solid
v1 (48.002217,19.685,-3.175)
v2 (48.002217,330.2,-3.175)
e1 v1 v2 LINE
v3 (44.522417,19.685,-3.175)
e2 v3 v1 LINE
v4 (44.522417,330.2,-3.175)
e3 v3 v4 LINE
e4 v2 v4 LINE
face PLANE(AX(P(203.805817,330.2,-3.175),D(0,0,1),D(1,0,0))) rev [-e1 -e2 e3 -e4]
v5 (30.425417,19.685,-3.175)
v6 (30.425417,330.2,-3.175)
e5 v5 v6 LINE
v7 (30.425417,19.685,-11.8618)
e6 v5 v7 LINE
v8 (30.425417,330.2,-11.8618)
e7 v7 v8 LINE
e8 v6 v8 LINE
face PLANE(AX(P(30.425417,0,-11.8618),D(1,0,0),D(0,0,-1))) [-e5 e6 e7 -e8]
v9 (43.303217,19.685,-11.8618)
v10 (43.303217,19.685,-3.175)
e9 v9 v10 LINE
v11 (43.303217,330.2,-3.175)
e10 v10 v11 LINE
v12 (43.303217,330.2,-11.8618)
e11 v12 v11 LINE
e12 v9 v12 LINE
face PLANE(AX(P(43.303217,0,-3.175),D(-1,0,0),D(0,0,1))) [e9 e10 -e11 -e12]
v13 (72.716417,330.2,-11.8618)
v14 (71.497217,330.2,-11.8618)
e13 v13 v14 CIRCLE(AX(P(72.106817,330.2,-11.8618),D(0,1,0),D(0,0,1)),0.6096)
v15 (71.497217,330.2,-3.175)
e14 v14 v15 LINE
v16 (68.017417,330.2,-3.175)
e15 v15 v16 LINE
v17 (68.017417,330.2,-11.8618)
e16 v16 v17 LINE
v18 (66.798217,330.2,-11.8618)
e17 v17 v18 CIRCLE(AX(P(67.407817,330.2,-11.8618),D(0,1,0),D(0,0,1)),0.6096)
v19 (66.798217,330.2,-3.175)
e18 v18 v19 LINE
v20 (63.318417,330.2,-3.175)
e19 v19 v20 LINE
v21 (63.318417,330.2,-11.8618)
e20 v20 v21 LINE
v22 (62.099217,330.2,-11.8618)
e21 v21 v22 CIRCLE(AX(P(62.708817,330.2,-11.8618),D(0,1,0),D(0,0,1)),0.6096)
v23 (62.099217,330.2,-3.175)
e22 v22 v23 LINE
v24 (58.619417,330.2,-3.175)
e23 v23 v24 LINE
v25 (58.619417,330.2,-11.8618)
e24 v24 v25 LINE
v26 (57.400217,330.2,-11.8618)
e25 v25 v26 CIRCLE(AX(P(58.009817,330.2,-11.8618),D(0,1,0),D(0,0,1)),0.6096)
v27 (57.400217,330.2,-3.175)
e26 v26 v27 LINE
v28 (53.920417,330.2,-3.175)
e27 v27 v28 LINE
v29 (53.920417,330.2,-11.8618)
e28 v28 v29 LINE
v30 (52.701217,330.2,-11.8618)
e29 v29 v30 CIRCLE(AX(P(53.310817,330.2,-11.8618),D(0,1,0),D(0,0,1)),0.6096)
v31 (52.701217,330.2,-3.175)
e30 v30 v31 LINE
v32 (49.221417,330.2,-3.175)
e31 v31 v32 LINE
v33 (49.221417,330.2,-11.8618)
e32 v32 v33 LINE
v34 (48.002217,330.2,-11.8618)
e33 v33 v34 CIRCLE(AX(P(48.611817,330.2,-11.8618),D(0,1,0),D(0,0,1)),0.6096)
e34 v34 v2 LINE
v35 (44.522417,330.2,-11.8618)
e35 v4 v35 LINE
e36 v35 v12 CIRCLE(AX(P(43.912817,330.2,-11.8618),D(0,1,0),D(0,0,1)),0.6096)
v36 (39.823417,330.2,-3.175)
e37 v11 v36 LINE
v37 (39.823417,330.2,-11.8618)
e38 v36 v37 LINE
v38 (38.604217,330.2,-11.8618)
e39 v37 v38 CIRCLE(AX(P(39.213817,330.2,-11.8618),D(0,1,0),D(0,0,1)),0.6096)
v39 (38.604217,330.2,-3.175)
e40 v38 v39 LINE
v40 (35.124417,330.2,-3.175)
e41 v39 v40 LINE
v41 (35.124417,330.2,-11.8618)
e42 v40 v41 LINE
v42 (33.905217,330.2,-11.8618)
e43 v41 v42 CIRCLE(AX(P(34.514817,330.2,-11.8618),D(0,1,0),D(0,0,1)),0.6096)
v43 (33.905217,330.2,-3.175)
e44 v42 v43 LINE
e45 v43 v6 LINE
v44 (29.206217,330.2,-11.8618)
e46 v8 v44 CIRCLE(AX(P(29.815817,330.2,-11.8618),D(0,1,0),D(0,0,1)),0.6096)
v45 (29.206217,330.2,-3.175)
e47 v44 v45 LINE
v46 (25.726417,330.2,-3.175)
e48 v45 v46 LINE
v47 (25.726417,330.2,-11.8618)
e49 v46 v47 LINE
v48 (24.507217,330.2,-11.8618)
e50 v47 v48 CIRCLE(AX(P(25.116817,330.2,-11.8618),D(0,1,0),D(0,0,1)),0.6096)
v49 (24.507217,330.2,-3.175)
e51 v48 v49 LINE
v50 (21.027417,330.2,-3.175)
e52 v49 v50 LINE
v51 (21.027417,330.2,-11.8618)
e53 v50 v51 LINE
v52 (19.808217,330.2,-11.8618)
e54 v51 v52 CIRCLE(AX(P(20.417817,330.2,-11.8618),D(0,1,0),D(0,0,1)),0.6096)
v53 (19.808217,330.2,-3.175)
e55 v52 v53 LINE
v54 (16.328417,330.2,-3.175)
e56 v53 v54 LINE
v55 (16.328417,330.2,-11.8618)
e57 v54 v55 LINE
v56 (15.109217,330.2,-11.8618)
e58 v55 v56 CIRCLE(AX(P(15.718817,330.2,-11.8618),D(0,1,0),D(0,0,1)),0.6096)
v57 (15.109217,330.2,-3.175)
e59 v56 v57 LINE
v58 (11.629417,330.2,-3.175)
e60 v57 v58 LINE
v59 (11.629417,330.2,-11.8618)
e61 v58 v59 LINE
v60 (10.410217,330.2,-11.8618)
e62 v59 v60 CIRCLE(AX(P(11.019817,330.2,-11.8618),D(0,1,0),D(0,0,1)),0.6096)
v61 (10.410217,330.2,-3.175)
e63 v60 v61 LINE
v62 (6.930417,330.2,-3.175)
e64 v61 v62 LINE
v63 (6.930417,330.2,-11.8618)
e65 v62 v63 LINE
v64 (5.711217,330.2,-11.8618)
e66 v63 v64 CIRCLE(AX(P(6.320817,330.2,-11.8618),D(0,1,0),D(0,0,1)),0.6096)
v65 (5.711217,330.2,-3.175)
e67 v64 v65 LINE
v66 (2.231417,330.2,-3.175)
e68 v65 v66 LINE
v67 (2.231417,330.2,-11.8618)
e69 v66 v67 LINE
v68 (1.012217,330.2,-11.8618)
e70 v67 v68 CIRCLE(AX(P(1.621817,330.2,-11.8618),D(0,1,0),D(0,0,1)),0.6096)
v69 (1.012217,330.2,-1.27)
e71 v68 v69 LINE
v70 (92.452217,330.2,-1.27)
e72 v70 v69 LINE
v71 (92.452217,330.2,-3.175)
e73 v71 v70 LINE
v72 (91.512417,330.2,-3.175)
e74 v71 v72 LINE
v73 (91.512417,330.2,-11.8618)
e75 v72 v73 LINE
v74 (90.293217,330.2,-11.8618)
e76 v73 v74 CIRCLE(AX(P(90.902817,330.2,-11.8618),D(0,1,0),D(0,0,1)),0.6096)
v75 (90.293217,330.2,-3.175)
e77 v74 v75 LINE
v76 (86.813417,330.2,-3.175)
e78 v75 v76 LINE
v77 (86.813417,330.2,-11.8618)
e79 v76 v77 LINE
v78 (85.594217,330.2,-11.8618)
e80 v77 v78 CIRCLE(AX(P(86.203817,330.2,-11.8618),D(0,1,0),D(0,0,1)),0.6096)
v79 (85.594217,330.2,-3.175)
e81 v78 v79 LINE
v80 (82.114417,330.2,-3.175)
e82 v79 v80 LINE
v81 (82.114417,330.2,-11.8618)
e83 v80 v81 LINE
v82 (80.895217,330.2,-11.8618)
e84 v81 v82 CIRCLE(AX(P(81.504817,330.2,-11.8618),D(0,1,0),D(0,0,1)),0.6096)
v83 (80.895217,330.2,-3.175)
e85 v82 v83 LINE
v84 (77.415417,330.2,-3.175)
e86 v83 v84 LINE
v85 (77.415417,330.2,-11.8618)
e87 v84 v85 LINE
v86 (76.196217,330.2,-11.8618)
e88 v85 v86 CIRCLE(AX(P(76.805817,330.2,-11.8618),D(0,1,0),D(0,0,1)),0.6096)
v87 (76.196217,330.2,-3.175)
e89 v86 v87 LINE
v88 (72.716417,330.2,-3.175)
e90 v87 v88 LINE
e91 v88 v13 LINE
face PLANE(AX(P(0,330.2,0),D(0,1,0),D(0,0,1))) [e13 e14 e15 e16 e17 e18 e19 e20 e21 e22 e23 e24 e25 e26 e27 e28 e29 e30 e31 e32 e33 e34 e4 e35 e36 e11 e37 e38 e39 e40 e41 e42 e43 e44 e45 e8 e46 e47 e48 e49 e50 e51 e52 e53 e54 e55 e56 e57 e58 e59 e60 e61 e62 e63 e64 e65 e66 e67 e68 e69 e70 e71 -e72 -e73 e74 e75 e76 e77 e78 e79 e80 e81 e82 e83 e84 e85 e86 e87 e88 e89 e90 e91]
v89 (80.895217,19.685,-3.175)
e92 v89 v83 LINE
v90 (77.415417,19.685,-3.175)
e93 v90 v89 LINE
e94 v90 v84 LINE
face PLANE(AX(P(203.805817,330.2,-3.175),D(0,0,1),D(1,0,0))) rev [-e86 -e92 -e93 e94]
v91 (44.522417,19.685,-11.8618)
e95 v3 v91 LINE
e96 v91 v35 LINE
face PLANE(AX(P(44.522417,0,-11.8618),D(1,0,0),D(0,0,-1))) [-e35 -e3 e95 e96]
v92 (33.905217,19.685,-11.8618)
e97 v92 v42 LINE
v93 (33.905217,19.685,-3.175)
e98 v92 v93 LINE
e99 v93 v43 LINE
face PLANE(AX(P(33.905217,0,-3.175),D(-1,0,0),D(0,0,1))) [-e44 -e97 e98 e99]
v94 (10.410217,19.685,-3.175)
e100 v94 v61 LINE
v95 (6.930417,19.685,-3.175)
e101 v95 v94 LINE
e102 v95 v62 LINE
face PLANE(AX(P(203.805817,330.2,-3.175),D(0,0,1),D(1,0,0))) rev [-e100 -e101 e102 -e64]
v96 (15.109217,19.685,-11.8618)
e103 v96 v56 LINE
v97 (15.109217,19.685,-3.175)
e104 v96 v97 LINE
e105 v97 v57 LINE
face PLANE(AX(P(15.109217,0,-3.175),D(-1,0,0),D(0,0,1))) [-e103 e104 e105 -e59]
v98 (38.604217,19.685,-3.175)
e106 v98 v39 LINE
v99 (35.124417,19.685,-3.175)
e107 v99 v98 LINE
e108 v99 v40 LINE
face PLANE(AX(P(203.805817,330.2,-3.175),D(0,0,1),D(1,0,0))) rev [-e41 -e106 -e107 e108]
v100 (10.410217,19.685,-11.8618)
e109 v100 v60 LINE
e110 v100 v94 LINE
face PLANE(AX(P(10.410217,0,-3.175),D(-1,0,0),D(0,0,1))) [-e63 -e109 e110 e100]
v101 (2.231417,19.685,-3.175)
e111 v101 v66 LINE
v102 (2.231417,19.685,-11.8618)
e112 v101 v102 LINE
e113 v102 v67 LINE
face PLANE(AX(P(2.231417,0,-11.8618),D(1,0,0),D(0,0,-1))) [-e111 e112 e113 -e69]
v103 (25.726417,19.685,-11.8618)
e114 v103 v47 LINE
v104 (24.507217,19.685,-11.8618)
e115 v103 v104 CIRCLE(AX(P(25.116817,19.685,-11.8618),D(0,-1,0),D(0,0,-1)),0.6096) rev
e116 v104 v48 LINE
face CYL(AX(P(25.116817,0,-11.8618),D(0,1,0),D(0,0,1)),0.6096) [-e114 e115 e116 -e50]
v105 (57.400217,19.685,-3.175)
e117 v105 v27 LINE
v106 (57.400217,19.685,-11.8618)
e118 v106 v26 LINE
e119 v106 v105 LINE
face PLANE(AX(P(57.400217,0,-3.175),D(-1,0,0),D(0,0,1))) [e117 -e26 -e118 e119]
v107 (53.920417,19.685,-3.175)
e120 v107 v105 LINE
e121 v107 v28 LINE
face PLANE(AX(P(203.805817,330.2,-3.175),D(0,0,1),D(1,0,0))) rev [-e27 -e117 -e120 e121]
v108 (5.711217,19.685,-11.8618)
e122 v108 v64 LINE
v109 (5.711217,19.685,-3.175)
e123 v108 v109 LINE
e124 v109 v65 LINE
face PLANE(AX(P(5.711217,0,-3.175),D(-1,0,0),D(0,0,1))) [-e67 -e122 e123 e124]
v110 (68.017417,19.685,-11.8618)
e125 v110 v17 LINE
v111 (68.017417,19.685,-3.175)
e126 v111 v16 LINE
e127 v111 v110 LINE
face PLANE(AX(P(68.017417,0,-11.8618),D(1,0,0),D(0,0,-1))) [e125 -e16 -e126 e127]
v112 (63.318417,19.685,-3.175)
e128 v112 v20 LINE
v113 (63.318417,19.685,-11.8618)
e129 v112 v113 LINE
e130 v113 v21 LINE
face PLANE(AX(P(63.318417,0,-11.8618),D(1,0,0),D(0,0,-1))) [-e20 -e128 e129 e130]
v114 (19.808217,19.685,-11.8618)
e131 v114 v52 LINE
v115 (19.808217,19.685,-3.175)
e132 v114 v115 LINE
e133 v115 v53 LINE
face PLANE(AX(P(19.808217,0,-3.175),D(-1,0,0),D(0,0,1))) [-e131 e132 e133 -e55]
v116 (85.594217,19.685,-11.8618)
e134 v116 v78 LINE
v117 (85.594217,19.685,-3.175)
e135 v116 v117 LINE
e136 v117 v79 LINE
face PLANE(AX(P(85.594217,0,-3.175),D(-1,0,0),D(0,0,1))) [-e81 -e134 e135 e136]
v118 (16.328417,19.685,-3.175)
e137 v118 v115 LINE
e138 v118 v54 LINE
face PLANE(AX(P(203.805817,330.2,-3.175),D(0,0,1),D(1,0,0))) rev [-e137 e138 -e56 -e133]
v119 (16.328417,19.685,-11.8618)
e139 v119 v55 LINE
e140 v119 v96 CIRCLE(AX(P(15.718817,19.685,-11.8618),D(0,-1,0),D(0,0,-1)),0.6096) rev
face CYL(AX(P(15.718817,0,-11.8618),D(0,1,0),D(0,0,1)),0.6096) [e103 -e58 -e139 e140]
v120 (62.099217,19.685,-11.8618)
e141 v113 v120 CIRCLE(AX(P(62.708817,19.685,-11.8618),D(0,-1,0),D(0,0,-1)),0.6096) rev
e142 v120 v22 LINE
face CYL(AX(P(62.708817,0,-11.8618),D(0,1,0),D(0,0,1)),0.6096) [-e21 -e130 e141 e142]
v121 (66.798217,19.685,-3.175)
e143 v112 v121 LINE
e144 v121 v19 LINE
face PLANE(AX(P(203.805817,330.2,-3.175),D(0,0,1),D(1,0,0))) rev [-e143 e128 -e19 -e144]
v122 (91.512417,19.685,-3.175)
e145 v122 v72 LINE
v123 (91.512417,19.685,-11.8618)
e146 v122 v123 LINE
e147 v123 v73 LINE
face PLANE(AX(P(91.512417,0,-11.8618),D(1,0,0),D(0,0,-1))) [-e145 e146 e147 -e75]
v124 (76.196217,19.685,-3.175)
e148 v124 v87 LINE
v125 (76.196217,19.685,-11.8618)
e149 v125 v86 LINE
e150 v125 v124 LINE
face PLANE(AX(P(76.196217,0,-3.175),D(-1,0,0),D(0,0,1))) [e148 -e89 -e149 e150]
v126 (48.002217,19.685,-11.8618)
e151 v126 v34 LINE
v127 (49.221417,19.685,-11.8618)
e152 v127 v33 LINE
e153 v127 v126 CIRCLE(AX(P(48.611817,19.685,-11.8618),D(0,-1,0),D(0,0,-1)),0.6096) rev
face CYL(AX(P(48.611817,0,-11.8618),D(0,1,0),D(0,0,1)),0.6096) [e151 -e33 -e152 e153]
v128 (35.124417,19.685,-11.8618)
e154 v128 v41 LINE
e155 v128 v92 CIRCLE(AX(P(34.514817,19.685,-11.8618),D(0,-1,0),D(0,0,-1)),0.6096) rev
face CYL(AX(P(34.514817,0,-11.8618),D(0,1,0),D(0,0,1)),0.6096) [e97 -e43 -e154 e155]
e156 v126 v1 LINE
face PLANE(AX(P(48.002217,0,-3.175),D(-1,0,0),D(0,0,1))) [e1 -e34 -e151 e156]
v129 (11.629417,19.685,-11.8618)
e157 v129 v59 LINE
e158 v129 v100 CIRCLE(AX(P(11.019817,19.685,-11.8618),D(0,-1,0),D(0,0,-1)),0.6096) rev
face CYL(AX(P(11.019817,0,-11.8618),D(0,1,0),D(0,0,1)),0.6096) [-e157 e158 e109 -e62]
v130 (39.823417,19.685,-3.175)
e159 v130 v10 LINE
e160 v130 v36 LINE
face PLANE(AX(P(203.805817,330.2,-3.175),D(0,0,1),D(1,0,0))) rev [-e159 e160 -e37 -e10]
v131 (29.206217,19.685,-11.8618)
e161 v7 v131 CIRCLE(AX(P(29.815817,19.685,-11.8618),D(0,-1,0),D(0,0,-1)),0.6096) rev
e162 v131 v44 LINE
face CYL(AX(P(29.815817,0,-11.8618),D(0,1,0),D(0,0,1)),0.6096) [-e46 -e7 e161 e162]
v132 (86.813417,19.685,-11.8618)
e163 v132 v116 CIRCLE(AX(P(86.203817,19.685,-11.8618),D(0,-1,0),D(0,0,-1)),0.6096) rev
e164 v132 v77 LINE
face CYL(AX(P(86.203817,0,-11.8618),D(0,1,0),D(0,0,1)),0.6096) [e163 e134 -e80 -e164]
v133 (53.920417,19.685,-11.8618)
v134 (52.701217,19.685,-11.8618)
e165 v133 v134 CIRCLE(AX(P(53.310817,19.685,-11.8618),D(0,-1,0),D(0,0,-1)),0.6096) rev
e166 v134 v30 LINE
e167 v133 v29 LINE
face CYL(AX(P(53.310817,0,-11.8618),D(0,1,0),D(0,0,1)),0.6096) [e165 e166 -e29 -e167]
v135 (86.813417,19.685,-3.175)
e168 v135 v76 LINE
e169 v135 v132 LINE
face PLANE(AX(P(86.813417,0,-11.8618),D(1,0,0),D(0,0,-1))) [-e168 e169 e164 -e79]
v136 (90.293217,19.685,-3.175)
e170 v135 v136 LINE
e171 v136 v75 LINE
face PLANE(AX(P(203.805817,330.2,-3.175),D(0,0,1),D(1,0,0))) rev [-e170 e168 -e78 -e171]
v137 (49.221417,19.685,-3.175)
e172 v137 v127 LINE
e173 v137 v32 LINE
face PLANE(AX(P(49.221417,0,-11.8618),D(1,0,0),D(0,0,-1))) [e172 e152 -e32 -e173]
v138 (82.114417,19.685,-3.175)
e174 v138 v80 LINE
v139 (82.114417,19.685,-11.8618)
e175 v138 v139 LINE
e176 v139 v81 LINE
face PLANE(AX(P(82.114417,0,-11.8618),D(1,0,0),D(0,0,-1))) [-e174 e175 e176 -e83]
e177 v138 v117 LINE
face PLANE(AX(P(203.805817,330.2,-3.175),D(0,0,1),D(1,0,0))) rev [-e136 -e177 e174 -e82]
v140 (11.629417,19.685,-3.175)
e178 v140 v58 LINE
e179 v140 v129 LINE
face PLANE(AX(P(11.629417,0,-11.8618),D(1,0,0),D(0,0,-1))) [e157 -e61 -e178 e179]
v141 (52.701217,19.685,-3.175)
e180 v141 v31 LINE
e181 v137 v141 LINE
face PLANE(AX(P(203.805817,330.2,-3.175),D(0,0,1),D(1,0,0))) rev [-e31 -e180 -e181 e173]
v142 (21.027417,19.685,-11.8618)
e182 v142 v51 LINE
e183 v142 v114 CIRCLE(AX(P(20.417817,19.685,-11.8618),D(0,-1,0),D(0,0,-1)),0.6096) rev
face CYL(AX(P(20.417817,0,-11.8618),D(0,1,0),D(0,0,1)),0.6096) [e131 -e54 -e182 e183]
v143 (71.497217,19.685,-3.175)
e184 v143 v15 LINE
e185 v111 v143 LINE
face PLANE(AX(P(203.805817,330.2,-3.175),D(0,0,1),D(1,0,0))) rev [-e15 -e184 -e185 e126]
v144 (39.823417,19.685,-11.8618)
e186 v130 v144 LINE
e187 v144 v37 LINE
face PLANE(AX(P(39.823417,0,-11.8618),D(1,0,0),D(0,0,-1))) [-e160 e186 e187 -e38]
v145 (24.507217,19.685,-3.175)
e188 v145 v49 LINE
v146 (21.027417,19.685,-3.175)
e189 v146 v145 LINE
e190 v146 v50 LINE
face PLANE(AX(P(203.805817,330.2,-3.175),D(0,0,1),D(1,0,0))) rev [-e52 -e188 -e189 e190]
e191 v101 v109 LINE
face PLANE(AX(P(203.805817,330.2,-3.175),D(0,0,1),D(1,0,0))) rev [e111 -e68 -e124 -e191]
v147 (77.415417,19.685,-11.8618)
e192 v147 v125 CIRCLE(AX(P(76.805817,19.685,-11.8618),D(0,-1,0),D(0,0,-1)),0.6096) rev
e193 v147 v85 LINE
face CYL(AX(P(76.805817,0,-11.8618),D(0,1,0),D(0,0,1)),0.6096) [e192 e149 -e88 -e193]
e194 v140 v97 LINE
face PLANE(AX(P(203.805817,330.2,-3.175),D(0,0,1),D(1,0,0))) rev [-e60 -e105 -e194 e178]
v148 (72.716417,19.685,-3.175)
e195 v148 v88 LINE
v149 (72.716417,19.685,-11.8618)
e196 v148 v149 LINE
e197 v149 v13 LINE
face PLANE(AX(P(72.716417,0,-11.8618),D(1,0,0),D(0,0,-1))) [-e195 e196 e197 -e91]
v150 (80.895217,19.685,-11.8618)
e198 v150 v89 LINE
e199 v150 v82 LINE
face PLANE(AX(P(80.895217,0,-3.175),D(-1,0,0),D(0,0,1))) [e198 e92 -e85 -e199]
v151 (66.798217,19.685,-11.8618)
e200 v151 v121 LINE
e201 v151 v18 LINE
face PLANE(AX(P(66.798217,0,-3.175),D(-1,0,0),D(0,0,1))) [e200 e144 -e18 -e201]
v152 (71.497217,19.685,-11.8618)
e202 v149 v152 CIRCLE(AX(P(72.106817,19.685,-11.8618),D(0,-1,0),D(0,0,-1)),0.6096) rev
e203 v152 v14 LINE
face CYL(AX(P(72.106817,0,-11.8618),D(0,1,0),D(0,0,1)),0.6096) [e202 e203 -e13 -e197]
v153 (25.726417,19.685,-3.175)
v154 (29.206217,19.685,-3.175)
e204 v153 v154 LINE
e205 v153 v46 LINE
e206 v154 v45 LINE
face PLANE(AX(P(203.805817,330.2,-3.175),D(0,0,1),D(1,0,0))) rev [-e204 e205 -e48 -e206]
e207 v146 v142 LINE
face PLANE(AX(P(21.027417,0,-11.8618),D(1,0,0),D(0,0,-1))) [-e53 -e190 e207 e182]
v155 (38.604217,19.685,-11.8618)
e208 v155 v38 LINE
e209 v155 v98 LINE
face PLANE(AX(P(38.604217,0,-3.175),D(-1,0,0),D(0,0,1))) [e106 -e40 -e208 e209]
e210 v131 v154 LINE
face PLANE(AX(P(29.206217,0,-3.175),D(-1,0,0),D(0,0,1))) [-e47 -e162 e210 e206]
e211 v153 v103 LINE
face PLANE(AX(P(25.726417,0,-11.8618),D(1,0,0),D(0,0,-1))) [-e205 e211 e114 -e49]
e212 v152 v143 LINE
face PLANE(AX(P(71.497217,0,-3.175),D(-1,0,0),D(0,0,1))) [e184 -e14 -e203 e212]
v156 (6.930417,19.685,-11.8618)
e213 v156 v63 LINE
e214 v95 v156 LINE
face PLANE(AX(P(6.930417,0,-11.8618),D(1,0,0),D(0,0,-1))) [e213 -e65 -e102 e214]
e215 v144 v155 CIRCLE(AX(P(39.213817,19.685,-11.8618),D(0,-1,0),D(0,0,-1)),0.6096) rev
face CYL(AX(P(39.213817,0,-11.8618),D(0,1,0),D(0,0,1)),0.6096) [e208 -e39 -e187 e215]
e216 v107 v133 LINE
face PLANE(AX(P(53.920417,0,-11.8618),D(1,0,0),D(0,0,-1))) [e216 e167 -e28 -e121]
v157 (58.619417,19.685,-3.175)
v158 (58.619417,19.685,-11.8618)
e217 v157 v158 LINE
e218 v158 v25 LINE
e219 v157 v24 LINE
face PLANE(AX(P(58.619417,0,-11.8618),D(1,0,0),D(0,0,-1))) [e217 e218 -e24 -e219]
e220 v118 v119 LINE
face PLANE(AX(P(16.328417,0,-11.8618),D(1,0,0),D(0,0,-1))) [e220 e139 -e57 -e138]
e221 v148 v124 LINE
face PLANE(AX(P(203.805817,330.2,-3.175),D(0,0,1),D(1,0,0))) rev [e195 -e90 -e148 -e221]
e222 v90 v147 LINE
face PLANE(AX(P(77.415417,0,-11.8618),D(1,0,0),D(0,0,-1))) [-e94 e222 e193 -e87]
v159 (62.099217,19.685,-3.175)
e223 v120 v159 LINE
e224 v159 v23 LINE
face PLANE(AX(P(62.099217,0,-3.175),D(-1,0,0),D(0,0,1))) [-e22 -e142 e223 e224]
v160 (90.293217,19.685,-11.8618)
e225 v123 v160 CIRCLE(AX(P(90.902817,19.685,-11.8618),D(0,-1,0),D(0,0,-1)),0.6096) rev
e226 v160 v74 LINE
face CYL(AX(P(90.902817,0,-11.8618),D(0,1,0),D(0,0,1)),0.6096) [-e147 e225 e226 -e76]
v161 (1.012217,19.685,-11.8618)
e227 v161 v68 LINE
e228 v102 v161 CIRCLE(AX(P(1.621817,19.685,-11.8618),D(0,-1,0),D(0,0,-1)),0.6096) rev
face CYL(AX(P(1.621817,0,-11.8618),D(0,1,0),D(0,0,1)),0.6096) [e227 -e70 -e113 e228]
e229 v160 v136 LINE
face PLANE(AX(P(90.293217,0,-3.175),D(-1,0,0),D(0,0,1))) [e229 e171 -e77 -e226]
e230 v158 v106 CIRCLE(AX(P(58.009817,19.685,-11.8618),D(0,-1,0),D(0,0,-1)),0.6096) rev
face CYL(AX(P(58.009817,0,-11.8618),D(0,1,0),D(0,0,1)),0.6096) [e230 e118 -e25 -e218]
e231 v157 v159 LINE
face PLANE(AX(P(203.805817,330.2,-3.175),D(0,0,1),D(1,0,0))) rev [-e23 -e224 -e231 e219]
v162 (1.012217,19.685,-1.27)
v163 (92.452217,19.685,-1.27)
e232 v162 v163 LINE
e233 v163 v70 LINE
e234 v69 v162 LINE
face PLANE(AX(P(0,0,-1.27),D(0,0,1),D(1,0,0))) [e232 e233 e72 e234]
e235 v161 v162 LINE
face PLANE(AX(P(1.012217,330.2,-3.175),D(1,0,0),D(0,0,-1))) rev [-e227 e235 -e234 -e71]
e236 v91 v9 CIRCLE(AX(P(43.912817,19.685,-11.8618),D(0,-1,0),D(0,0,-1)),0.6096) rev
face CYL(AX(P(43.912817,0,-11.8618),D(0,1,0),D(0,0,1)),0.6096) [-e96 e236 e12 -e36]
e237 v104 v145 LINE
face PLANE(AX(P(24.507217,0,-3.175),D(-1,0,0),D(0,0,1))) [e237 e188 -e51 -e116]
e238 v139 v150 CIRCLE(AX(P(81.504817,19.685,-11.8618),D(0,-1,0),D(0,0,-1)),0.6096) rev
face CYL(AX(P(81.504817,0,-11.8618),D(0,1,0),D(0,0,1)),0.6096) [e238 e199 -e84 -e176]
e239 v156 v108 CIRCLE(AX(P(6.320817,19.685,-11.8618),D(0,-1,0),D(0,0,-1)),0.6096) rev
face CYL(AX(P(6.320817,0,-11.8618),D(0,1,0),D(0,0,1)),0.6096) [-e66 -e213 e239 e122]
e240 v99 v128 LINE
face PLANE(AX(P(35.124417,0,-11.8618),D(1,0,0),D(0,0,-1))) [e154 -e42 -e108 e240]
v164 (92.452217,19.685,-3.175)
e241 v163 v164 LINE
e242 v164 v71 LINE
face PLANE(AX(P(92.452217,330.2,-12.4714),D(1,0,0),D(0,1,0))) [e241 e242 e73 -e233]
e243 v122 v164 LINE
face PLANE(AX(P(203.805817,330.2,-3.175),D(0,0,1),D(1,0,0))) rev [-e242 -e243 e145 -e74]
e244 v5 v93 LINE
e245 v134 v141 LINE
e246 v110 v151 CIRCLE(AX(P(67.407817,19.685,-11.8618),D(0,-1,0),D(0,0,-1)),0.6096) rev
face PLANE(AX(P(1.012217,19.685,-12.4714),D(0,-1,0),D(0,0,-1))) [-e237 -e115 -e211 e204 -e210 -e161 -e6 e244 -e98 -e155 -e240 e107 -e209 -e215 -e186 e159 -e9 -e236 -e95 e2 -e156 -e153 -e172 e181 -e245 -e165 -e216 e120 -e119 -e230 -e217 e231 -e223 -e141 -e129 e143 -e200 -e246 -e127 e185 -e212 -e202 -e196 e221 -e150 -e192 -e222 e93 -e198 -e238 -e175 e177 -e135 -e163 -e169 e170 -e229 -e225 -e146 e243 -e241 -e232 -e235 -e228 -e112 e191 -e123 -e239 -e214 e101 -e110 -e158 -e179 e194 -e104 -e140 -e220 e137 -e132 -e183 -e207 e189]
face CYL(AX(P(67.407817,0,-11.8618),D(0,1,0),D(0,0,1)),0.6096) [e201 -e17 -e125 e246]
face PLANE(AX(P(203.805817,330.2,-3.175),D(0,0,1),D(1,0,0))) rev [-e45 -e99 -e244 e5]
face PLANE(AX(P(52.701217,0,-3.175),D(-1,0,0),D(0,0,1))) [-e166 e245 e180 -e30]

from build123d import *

# Parameters (mm, degrees)
BOSS_EXTRUDE1_DEPTH   = 330.2
BOSS_EXTRUDE2_DEPTH   = 330.2
SKETCH_PATTERN1_DEPTH = 330.2
SKETCH5_W             = 0.4826
SKETCH5_H             = 3.175
BOSS_EXTRUDE3_DEPTH   = 254
SKETCH10_OUTSIDE_W    = 282.866
SKETCH10_OUTSIDE_H    = 409.79
SKETCH10_OUTSIDE_W_2  = 91.44
SKETCH10_OUTSIDE_H_2  = 330.2
CUT_EXTRUDE3_DEPTH    = 389.485949469
SKETCH11_OUTSIDE_W    = 162.01
SKETCH11_OUTSIDE_H    = 400.77
SKETCH11_OUTSIDE_W_2  = 91.44
SKETCH11_OUTSIDE_H_2  = 310.515
CUT_EXTRUDE4_DEPTH    = 344.125324268
SKETCH12_W            = 91.44
SKETCH12_H            = 310.515
CUT_EXTRUDE5_DEPTH    = 1.27


# Read off the part's stored shape, not the designer's step: Sketch-Pattern1
with BuildPart() as part:
    # Sketch1 → Boss-Extrude1 (new body)
    with BuildSketch(Plane(origin=(0, 0, 0), x_dir=(1, 0, 0), z_dir=(0, 1, 0))):
        Polygon((1.012216501, 3.175), (1.012216501, 0), (203.805816501, 0), (203.805816501, 3.175), (2.231416501, 3.175), align=None)
    extrude(amount=BOSS_EXTRUDE1_DEPTH)

    # Sketch3 → Boss-Extrude2 (add, through all)
    with BuildSketch(Plane(origin=(0, 330.2, 0), x_dir=(1, 0, 0), z_dir=(0, 1, 0))):
        with BuildLine():
            Line((1.012216501, 3.175), (1.012216501, 11.8618))
            ThreePointArc((1.012216501, 11.8618), (1.621816501, 12.4714), (2.231416501, 11.8618))
            Line((2.231416501, 11.8618), (2.231416501, 3.175))
            Line((2.231416501, 3.175), (1.012216501, 3.175))
        make_face()
    extrude(amount=-BOSS_EXTRUDE2_DEPTH)

    # Sketch-Pattern1 outline → Sketch-Pattern1 (add)
    with BuildSketch(Plane(origin=(0, 0, 0), x_dir=(1, 0, 0), z_dir=(0, 1, 0))):
        with BuildLine():
            Line((6.930416501, 3.175), (6.930416501, 11.8618))
            ThreePointArc((6.930416501, 11.8618), (6.320816501, 12.4714), (5.711216501, 11.8618))
            Line((5.711216501, 11.8618), (5.711216501, 3.175))
            Line((5.711216501, 3.175), (6.930416501, 3.175))
        make_face()
        with BuildLine():
            Line((203.069216501, 11.8618), (203.069216501, 3.175))
            Line((203.069216501, 3.175), (204.288416501, 3.175))
            Line((204.288416501, 3.175), (204.288416501, 11.8618))
            ThreePointArc((204.288416501, 11.8618), (203.678816501, 12.4714), (203.069216501, 11.8618))
        make_face()
        with BuildLine():
            Line((198.370216501, 11.8618), (198.370216501, 3.175))
            Line((198.370216501, 3.175), (199.589416501, 3.175))
            Line((199.589416501, 3.175), (199.589416501, 11.8618))
            ThreePointArc((199.589416501, 11.8618), (198.979816501, 12.4714), (198.370216501, 11.8618))
        make_face()
        with BuildLine():
            Line((193.671216501, 11.8618), (193.671216501, 3.175))
            Line((193.671216501, 3.175), (194.890416501, 3.175))
            Line((194.890416501, 3.175), (194.890416501, 11.8618))
            ThreePointArc((194.890416501, 11.8618), (194.280816501, 12.4714), (193.671216501, 11.8618))
        make_face()
        with BuildLine():
            Line((188.972216501, 11.8618), (188.972216501, 3.175))
            Line((188.972216501, 3.175), (190.191416501, 3.175))
            Line((190.191416501, 3.175), (190.191416501, 11.8618))
            ThreePointArc((190.191416501, 11.8618), (189.581816501, 12.4714), (188.972216501, 11.8618))
        make_face()
        with BuildLine():
            Line((184.273216501, 11.8618), (184.273216501, 3.175))
            Line((184.273216501, 3.175), (185.492416501, 3.175))
            Line((185.492416501, 3.175), (185.492416501, 11.8618))
            ThreePointArc((185.492416501, 11.8618), (184.882816501, 12.4714), (184.273216501, 11.8618))
        make_face()
        with BuildLine():
            Line((179.574216501, 11.8618), (179.574216501, 3.175))
            Line((179.574216501, 3.175), (180.793416501, 3.175))
            Line((180.793416501, 3.175), (180.793416501, 11.8618))
            ThreePointArc((180.793416501, 11.8618), (180.183816501, 12.4714), (179.574216501, 11.8618))
        make_face()
        with BuildLine():
            Line((174.875216501, 11.8618), (174.875216501, 3.175))
            Line((174.875216501, 3.175), (176.094416501, 3.175))
            Line((176.094416501, 3.175), (176.094416501, 11.8618))
            ThreePointArc((176.094416501, 11.8618), (175.484816501, 12.4714), (174.875216501, 11.8618))
        make_face()
        with BuildLine():
            Line((170.176216501, 11.8618), (170.176216501, 3.175))
            Line((170.176216501, 3.175), (171.395416501, 3.175))
            Line((171.395416501, 3.175), (171.395416501, 11.8618))
            ThreePointArc((171.395416501, 11.8618), (170.785816501, 12.4714), (170.176216501, 11.8618))
        make_face()
        with BuildLine():
            Line((165.477216501, 11.8618), (165.477216501, 3.175))
            Line((165.477216501, 3.175), (166.696416501, 3.175))
            Line((166.696416501, 3.175), (166.696416501, 11.8618))
            ThreePointArc((166.696416501, 11.8618), (166.086816501, 12.4714), (165.477216501, 11.8618))
        make_face()
        with BuildLine():
            Line((160.778216501, 11.8618), (160.778216501, 3.175))
            Line((160.778216501, 3.175), (161.997416501, 3.175))
            Line((161.997416501, 3.175), (161.997416501, 11.8618))
            ThreePointArc((161.997416501, 11.8618), (161.387816501, 12.4714), (160.778216501, 11.8618))
        make_face()
        with BuildLine():
            Line((156.079216501, 11.8618), (156.079216501, 3.175))
            Line((156.079216501, 3.175), (157.298416501, 3.175))
            Line((157.298416501, 3.175), (157.298416501, 11.8618))
            ThreePointArc((157.298416501, 11.8618), (156.688816501, 12.4714), (156.079216501, 11.8618))
        make_face()
        with BuildLine():
            Line((151.380216501, 11.8618), (151.380216501, 3.175))
            Line((151.380216501, 3.175), (152.599416501, 3.175))
            Line((152.599416501, 3.175), (152.599416501, 11.8618))
            ThreePointArc((152.599416501, 11.8618), (151.989816501, 12.4714), (151.380216501, 11.8618))
        make_face()
        with BuildLine():
            Line((146.681216501, 11.8618), (146.681216501, 3.175))
            Line((146.681216501, 3.175), (147.900416501, 3.175))
            Line((147.900416501, 3.175), (147.900416501, 11.8618))
            ThreePointArc((147.900416501, 11.8618), (147.290816501, 12.4714), (146.681216501, 11.8618))
        make_face()
        with BuildLine():
            Line((141.982216501, 11.8618), (141.982216501, 3.175))
            Line((141.982216501, 3.175), (143.201416501, 3.175))
            Line((143.201416501, 3.175), (143.201416501, 11.8618))
            ThreePointArc((143.201416501, 11.8618), (142.591816501, 12.4714), (141.982216501, 11.8618))
        make_face()
        with BuildLine():
            Line((137.283216501, 11.8618), (137.283216501, 3.175))
            Line((137.283216501, 3.175), (138.502416501, 3.175))
            Line((138.502416501, 3.175), (138.502416501, 11.8618))
            ThreePointArc((138.502416501, 11.8618), (137.892816501, 12.4714), (137.283216501, 11.8618))
        make_face()
        with BuildLine():
            Line((132.584216501, 11.8618), (132.584216501, 3.175))
            Line((132.584216501, 3.175), (133.803416501, 3.175))
            Line((133.803416501, 3.175), (133.803416501, 11.8618))
            ThreePointArc((133.803416501, 11.8618), (133.193816501, 12.4714), (132.584216501, 11.8618))
        make_face()
        with BuildLine():
            Line((127.885216501, 11.8618), (127.885216501, 3.175))
            Line((127.885216501, 3.175), (129.104416501, 3.175))
            Line((129.104416501, 3.175), (129.104416501, 11.8618))
            ThreePointArc((129.104416501, 11.8618), (128.494816501, 12.4714), (127.885216501, 11.8618))
        make_face()
        with BuildLine():
            Line((123.186216501, 11.8618), (123.186216501, 3.175))
            Line((123.186216501, 3.175), (124.405416501, 3.175))
            Line((124.405416501, 3.175), (124.405416501, 11.8618))
            ThreePointArc((124.405416501, 11.8618), (123.795816501, 12.4714), (123.186216501, 11.8618))
        make_face()
        with BuildLine():
            Line((118.487216501, 11.8618), (118.487216501, 3.175))
            Line((118.487216501, 3.175), (119.706416501, 3.175))
            Line((119.706416501, 3.175), (119.706416501, 11.8618))
            ThreePointArc((119.706416501, 11.8618), (119.096816501, 12.4714), (118.487216501, 11.8618))
        make_face()
        with BuildLine():
            Line((113.788216501, 11.8618), (113.788216501, 3.175))
            Line((113.788216501, 3.175), (115.007416501, 3.175))
            Line((115.007416501, 3.175), (115.007416501, 11.8618))
            ThreePointArc((115.007416501, 11.8618), (114.397816501, 12.4714), (113.788216501, 11.8618))
        make_face()
        with BuildLine():
            Line((109.089216501, 11.8618), (109.089216501, 3.175))
            Line((109.089216501, 3.175), (110.308416501, 3.175))
            Line((110.308416501, 3.175), (110.308416501, 11.8618))
            ThreePointArc((110.308416501, 11.8618), (109.698816501, 12.4714), (109.089216501, 11.8618))
        make_face()
        with BuildLine():
            Line((104.390216501, 11.8618), (104.390216501, 3.175))
            Line((104.390216501, 3.175), (105.609416501, 3.175))
            Line((105.609416501, 3.175), (105.609416501, 11.8618))
            ThreePointArc((105.609416501, 11.8618), (104.999816501, 12.4714), (104.390216501, 11.8618))
        make_face()
        with BuildLine():
            Line((99.691216501, 11.8618), (99.691216501, 3.175))
            Line((99.691216501, 3.175), (100.910416501, 3.175))
            Line((100.910416501, 3.175), (100.910416501, 11.8618))
            ThreePointArc((100.910416501, 11.8618), (100.300816501, 12.4714), (99.691216501, 11.8618))
        make_face()
        with BuildLine():
            Line((94.992216501, 11.8618), (94.992216501, 3.175))
            Line((94.992216501, 3.175), (96.211416501, 3.175))
            Line((96.211416501, 3.175), (96.211416501, 11.8618))
            ThreePointArc((96.211416501, 11.8618), (95.601816501, 12.4714), (94.992216501, 11.8618))
        make_face()
        with BuildLine():
            Line((90.293216501, 11.8618), (90.293216501, 3.175))
            Line((90.293216501, 3.175), (91.512416501, 3.175))
            Line((91.512416501, 3.175), (91.512416501, 11.8618))
            ThreePointArc((91.512416501, 11.8618), (90.902816501, 12.4714), (90.293216501, 11.8618))
        make_face()
        with BuildLine():
            Line((85.594216501, 11.8618), (85.594216501, 3.175))
            Line((85.594216501, 3.175), (86.813416501, 3.175))
            Line((86.813416501, 3.175), (86.813416501, 11.8618))
            ThreePointArc((86.813416501, 11.8618), (86.203816501, 12.4714), (85.594216501, 11.8618))
        make_face()
        with BuildLine():
            Line((80.895216501, 11.8618), (80.895216501, 3.175))
            Line((80.895216501, 3.175), (82.114416501, 3.175))
            Line((82.114416501, 3.175), (82.114416501, 11.8618))
            ThreePointArc((82.114416501, 11.8618), (81.504816501, 12.4714), (80.895216501, 11.8618))
        make_face()
        with BuildLine():
            Line((76.196216501, 11.8618), (76.196216501, 3.175))
            Line((76.196216501, 3.175), (77.415416501, 3.175))
            Line((77.415416501, 3.175), (77.415416501, 11.8618))
            ThreePointArc((77.415416501, 11.8618), (76.805816501, 12.4714), (76.196216501, 11.8618))
        make_face()
        with BuildLine():
            Line((71.497216501, 11.8618), (71.497216501, 3.175))
            Line((71.497216501, 3.175), (72.716416501, 3.175))
            Line((72.716416501, 3.175), (72.716416501, 11.8618))
            ThreePointArc((72.716416501, 11.8618), (72.106816501, 12.4714), (71.497216501, 11.8618))
        make_face()
        with BuildLine():
            Line((66.798216501, 11.8618), (66.798216501, 3.175))
            Line((66.798216501, 3.175), (68.017416501, 3.175))
            Line((68.017416501, 3.175), (68.017416501, 11.8618))
            ThreePointArc((68.017416501, 11.8618), (67.407816501, 12.4714), (66.798216501, 11.8618))
        make_face()
        with BuildLine():
            Line((62.099216501, 11.8618), (62.099216501, 3.175))
            Line((62.099216501, 3.175), (63.318416501, 3.175))
            Line((63.318416501, 3.175), (63.318416501, 11.8618))
            ThreePointArc((63.318416501, 11.8618), (62.708816501, 12.4714), (62.099216501, 11.8618))
        make_face()
        with BuildLine():
            Line((57.400216501, 11.8618), (57.400216501, 3.175))
            Line((57.400216501, 3.175), (58.619416501, 3.175))
            Line((58.619416501, 3.175), (58.619416501, 11.8618))
            ThreePointArc((58.619416501, 11.8618), (58.009816501, 12.4714), (57.400216501, 11.8618))
        make_face()
        with BuildLine():
            Line((52.701216501, 11.8618), (52.701216501, 3.175))
            Line((52.701216501, 3.175), (53.920416501, 3.175))
            Line((53.920416501, 3.175), (53.920416501, 11.8618))
            ThreePointArc((53.920416501, 11.8618), (53.310816501, 12.4714), (52.701216501, 11.8618))
        make_face()
        with BuildLine():
            Line((48.002216501, 11.8618), (48.002216501, 3.175))
            Line((48.002216501, 3.175), (49.221416501, 3.175))
            Line((49.221416501, 3.175), (49.221416501, 11.8618))
            ThreePointArc((49.221416501, 11.8618), (48.611816501, 12.4714), (48.002216501, 11.8618))
        make_face()
        with BuildLine():
            Line((43.303216501, 11.8618), (43.303216501, 3.175))
            Line((43.303216501, 3.175), (44.522416501, 3.175))
            Line((44.522416501, 3.175), (44.522416501, 11.8618))
            ThreePointArc((44.522416501, 11.8618), (43.912816501, 12.4714), (43.303216501, 11.8618))
        make_face()
        with BuildLine():
            Line((38.604216501, 11.8618), (38.604216501, 3.175))
            Line((38.604216501, 3.175), (39.823416501, 3.175))
            Line((39.823416501, 3.175), (39.823416501, 11.8618))
            ThreePointArc((39.823416501, 11.8618), (39.213816501, 12.4714), (38.604216501, 11.8618))
        make_face()
        with BuildLine():
            Line((33.905216501, 11.8618), (33.905216501, 3.175))
            Line((33.905216501, 3.175), (35.124416501, 3.175))
            Line((35.124416501, 3.175), (35.124416501, 11.8618))
            ThreePointArc((35.124416501, 11.8618), (34.514816501, 12.4714), (33.905216501, 11.8618))
        make_face()
        with BuildLine():
            Line((29.206216501, 11.8618), (29.206216501, 3.175))
            Line((29.206216501, 3.175), (30.425416501, 3.175))
            Line((30.425416501, 3.175), (30.425416501, 11.8618))
            ThreePointArc((30.425416501, 11.8618), (29.815816501, 12.4714), (29.206216501, 11.8618))
        make_face()
        with BuildLine():
            Line((24.507216501, 11.8618), (24.507216501, 3.175))
            Line((24.507216501, 3.175), (25.726416501, 3.175))
            Line((25.726416501, 3.175), (25.726416501, 11.8618))
            ThreePointArc((25.726416501, 11.8618), (25.116816501, 12.4714), (24.507216501, 11.8618))
        make_face()
        with BuildLine():
            Line((19.808216501, 11.8618), (19.808216501, 3.175))
            Line((19.808216501, 3.175), (21.027416501, 3.175))
            Line((21.027416501, 3.175), (21.027416501, 11.8618))
            ThreePointArc((21.027416501, 11.8618), (20.417816501, 12.4714), (19.808216501, 11.8618))
        make_face()
        with BuildLine():
            Line((15.109216501, 11.8618), (15.109216501, 3.175))
            Line((15.109216501, 3.175), (16.328416501, 3.175))
            Line((16.328416501, 3.175), (16.328416501, 11.8618))
            ThreePointArc((16.328416501, 11.8618), (15.718816501, 12.4714), (15.109216501, 11.8618))
        make_face()
        with BuildLine():
            Line((10.410216501, 11.8618), (10.410216501, 3.175))
            Line((10.410216501, 3.175), (11.629416501, 3.175))
            Line((11.629416501, 3.175), (11.629416501, 11.8618))
            ThreePointArc((11.629416501, 11.8618), (11.019816501, 12.4714), (10.410216501, 11.8618))
        make_face()
    extrude(amount=SKETCH_PATTERN1_DEPTH)

    # Sketch5 → Boss-Extrude3 (add)
    with BuildSketch(Plane(origin=(0, 330.2, 0), x_dir=(1, 0, 0), z_dir=(0, 1, 0))):
        with Locations((204.047116501, 1.5875)):
            Rectangle(SKETCH5_W, SKETCH5_H)
    extrude(amount=-BOSS_EXTRUDE3_DEPTH)

    # Sketch10 outside → Cut-Extrude3 (cut, through all)
    with BuildSketch(Plane.XY):
        with Locations((102.65, 165.1)):
            Rectangle(SKETCH10_OUTSIDE_W, SKETCH10_OUTSIDE_H)
        with Locations((46.732216501, 165.1)):
            Rectangle(SKETCH10_OUTSIDE_W_2, SKETCH10_OUTSIDE_H_2, mode=Mode.SUBTRACT)
    extrude(amount=-CUT_EXTRUDE3_DEPTH, mode=Mode.SUBTRACT)

    # Sketch11 outside → Cut-Extrude4 (cut, through all)
    with BuildSketch(Plane.XY):
        with Locations((46.732, 165.1)):
            Rectangle(SKETCH11_OUTSIDE_W, SKETCH11_OUTSIDE_H)
        with Locations((46.732216501, 174.9425)):
            Rectangle(SKETCH11_OUTSIDE_W_2, SKETCH11_OUTSIDE_H_2, mode=Mode.SUBTRACT)
    extrude(amount=-CUT_EXTRUDE4_DEPTH, mode=Mode.SUBTRACT)

    # Sketch12 → Cut-Extrude5 (cut)
    with BuildSketch(Plane.XY):
        with Locations((46.732216501, 174.9425)):
            Rectangle(SKETCH12_W, SKETCH12_H)
    extrude(amount=-CUT_EXTRUDE5_DEPTH, mode=Mode.SUBTRACT)


solid = part.part
